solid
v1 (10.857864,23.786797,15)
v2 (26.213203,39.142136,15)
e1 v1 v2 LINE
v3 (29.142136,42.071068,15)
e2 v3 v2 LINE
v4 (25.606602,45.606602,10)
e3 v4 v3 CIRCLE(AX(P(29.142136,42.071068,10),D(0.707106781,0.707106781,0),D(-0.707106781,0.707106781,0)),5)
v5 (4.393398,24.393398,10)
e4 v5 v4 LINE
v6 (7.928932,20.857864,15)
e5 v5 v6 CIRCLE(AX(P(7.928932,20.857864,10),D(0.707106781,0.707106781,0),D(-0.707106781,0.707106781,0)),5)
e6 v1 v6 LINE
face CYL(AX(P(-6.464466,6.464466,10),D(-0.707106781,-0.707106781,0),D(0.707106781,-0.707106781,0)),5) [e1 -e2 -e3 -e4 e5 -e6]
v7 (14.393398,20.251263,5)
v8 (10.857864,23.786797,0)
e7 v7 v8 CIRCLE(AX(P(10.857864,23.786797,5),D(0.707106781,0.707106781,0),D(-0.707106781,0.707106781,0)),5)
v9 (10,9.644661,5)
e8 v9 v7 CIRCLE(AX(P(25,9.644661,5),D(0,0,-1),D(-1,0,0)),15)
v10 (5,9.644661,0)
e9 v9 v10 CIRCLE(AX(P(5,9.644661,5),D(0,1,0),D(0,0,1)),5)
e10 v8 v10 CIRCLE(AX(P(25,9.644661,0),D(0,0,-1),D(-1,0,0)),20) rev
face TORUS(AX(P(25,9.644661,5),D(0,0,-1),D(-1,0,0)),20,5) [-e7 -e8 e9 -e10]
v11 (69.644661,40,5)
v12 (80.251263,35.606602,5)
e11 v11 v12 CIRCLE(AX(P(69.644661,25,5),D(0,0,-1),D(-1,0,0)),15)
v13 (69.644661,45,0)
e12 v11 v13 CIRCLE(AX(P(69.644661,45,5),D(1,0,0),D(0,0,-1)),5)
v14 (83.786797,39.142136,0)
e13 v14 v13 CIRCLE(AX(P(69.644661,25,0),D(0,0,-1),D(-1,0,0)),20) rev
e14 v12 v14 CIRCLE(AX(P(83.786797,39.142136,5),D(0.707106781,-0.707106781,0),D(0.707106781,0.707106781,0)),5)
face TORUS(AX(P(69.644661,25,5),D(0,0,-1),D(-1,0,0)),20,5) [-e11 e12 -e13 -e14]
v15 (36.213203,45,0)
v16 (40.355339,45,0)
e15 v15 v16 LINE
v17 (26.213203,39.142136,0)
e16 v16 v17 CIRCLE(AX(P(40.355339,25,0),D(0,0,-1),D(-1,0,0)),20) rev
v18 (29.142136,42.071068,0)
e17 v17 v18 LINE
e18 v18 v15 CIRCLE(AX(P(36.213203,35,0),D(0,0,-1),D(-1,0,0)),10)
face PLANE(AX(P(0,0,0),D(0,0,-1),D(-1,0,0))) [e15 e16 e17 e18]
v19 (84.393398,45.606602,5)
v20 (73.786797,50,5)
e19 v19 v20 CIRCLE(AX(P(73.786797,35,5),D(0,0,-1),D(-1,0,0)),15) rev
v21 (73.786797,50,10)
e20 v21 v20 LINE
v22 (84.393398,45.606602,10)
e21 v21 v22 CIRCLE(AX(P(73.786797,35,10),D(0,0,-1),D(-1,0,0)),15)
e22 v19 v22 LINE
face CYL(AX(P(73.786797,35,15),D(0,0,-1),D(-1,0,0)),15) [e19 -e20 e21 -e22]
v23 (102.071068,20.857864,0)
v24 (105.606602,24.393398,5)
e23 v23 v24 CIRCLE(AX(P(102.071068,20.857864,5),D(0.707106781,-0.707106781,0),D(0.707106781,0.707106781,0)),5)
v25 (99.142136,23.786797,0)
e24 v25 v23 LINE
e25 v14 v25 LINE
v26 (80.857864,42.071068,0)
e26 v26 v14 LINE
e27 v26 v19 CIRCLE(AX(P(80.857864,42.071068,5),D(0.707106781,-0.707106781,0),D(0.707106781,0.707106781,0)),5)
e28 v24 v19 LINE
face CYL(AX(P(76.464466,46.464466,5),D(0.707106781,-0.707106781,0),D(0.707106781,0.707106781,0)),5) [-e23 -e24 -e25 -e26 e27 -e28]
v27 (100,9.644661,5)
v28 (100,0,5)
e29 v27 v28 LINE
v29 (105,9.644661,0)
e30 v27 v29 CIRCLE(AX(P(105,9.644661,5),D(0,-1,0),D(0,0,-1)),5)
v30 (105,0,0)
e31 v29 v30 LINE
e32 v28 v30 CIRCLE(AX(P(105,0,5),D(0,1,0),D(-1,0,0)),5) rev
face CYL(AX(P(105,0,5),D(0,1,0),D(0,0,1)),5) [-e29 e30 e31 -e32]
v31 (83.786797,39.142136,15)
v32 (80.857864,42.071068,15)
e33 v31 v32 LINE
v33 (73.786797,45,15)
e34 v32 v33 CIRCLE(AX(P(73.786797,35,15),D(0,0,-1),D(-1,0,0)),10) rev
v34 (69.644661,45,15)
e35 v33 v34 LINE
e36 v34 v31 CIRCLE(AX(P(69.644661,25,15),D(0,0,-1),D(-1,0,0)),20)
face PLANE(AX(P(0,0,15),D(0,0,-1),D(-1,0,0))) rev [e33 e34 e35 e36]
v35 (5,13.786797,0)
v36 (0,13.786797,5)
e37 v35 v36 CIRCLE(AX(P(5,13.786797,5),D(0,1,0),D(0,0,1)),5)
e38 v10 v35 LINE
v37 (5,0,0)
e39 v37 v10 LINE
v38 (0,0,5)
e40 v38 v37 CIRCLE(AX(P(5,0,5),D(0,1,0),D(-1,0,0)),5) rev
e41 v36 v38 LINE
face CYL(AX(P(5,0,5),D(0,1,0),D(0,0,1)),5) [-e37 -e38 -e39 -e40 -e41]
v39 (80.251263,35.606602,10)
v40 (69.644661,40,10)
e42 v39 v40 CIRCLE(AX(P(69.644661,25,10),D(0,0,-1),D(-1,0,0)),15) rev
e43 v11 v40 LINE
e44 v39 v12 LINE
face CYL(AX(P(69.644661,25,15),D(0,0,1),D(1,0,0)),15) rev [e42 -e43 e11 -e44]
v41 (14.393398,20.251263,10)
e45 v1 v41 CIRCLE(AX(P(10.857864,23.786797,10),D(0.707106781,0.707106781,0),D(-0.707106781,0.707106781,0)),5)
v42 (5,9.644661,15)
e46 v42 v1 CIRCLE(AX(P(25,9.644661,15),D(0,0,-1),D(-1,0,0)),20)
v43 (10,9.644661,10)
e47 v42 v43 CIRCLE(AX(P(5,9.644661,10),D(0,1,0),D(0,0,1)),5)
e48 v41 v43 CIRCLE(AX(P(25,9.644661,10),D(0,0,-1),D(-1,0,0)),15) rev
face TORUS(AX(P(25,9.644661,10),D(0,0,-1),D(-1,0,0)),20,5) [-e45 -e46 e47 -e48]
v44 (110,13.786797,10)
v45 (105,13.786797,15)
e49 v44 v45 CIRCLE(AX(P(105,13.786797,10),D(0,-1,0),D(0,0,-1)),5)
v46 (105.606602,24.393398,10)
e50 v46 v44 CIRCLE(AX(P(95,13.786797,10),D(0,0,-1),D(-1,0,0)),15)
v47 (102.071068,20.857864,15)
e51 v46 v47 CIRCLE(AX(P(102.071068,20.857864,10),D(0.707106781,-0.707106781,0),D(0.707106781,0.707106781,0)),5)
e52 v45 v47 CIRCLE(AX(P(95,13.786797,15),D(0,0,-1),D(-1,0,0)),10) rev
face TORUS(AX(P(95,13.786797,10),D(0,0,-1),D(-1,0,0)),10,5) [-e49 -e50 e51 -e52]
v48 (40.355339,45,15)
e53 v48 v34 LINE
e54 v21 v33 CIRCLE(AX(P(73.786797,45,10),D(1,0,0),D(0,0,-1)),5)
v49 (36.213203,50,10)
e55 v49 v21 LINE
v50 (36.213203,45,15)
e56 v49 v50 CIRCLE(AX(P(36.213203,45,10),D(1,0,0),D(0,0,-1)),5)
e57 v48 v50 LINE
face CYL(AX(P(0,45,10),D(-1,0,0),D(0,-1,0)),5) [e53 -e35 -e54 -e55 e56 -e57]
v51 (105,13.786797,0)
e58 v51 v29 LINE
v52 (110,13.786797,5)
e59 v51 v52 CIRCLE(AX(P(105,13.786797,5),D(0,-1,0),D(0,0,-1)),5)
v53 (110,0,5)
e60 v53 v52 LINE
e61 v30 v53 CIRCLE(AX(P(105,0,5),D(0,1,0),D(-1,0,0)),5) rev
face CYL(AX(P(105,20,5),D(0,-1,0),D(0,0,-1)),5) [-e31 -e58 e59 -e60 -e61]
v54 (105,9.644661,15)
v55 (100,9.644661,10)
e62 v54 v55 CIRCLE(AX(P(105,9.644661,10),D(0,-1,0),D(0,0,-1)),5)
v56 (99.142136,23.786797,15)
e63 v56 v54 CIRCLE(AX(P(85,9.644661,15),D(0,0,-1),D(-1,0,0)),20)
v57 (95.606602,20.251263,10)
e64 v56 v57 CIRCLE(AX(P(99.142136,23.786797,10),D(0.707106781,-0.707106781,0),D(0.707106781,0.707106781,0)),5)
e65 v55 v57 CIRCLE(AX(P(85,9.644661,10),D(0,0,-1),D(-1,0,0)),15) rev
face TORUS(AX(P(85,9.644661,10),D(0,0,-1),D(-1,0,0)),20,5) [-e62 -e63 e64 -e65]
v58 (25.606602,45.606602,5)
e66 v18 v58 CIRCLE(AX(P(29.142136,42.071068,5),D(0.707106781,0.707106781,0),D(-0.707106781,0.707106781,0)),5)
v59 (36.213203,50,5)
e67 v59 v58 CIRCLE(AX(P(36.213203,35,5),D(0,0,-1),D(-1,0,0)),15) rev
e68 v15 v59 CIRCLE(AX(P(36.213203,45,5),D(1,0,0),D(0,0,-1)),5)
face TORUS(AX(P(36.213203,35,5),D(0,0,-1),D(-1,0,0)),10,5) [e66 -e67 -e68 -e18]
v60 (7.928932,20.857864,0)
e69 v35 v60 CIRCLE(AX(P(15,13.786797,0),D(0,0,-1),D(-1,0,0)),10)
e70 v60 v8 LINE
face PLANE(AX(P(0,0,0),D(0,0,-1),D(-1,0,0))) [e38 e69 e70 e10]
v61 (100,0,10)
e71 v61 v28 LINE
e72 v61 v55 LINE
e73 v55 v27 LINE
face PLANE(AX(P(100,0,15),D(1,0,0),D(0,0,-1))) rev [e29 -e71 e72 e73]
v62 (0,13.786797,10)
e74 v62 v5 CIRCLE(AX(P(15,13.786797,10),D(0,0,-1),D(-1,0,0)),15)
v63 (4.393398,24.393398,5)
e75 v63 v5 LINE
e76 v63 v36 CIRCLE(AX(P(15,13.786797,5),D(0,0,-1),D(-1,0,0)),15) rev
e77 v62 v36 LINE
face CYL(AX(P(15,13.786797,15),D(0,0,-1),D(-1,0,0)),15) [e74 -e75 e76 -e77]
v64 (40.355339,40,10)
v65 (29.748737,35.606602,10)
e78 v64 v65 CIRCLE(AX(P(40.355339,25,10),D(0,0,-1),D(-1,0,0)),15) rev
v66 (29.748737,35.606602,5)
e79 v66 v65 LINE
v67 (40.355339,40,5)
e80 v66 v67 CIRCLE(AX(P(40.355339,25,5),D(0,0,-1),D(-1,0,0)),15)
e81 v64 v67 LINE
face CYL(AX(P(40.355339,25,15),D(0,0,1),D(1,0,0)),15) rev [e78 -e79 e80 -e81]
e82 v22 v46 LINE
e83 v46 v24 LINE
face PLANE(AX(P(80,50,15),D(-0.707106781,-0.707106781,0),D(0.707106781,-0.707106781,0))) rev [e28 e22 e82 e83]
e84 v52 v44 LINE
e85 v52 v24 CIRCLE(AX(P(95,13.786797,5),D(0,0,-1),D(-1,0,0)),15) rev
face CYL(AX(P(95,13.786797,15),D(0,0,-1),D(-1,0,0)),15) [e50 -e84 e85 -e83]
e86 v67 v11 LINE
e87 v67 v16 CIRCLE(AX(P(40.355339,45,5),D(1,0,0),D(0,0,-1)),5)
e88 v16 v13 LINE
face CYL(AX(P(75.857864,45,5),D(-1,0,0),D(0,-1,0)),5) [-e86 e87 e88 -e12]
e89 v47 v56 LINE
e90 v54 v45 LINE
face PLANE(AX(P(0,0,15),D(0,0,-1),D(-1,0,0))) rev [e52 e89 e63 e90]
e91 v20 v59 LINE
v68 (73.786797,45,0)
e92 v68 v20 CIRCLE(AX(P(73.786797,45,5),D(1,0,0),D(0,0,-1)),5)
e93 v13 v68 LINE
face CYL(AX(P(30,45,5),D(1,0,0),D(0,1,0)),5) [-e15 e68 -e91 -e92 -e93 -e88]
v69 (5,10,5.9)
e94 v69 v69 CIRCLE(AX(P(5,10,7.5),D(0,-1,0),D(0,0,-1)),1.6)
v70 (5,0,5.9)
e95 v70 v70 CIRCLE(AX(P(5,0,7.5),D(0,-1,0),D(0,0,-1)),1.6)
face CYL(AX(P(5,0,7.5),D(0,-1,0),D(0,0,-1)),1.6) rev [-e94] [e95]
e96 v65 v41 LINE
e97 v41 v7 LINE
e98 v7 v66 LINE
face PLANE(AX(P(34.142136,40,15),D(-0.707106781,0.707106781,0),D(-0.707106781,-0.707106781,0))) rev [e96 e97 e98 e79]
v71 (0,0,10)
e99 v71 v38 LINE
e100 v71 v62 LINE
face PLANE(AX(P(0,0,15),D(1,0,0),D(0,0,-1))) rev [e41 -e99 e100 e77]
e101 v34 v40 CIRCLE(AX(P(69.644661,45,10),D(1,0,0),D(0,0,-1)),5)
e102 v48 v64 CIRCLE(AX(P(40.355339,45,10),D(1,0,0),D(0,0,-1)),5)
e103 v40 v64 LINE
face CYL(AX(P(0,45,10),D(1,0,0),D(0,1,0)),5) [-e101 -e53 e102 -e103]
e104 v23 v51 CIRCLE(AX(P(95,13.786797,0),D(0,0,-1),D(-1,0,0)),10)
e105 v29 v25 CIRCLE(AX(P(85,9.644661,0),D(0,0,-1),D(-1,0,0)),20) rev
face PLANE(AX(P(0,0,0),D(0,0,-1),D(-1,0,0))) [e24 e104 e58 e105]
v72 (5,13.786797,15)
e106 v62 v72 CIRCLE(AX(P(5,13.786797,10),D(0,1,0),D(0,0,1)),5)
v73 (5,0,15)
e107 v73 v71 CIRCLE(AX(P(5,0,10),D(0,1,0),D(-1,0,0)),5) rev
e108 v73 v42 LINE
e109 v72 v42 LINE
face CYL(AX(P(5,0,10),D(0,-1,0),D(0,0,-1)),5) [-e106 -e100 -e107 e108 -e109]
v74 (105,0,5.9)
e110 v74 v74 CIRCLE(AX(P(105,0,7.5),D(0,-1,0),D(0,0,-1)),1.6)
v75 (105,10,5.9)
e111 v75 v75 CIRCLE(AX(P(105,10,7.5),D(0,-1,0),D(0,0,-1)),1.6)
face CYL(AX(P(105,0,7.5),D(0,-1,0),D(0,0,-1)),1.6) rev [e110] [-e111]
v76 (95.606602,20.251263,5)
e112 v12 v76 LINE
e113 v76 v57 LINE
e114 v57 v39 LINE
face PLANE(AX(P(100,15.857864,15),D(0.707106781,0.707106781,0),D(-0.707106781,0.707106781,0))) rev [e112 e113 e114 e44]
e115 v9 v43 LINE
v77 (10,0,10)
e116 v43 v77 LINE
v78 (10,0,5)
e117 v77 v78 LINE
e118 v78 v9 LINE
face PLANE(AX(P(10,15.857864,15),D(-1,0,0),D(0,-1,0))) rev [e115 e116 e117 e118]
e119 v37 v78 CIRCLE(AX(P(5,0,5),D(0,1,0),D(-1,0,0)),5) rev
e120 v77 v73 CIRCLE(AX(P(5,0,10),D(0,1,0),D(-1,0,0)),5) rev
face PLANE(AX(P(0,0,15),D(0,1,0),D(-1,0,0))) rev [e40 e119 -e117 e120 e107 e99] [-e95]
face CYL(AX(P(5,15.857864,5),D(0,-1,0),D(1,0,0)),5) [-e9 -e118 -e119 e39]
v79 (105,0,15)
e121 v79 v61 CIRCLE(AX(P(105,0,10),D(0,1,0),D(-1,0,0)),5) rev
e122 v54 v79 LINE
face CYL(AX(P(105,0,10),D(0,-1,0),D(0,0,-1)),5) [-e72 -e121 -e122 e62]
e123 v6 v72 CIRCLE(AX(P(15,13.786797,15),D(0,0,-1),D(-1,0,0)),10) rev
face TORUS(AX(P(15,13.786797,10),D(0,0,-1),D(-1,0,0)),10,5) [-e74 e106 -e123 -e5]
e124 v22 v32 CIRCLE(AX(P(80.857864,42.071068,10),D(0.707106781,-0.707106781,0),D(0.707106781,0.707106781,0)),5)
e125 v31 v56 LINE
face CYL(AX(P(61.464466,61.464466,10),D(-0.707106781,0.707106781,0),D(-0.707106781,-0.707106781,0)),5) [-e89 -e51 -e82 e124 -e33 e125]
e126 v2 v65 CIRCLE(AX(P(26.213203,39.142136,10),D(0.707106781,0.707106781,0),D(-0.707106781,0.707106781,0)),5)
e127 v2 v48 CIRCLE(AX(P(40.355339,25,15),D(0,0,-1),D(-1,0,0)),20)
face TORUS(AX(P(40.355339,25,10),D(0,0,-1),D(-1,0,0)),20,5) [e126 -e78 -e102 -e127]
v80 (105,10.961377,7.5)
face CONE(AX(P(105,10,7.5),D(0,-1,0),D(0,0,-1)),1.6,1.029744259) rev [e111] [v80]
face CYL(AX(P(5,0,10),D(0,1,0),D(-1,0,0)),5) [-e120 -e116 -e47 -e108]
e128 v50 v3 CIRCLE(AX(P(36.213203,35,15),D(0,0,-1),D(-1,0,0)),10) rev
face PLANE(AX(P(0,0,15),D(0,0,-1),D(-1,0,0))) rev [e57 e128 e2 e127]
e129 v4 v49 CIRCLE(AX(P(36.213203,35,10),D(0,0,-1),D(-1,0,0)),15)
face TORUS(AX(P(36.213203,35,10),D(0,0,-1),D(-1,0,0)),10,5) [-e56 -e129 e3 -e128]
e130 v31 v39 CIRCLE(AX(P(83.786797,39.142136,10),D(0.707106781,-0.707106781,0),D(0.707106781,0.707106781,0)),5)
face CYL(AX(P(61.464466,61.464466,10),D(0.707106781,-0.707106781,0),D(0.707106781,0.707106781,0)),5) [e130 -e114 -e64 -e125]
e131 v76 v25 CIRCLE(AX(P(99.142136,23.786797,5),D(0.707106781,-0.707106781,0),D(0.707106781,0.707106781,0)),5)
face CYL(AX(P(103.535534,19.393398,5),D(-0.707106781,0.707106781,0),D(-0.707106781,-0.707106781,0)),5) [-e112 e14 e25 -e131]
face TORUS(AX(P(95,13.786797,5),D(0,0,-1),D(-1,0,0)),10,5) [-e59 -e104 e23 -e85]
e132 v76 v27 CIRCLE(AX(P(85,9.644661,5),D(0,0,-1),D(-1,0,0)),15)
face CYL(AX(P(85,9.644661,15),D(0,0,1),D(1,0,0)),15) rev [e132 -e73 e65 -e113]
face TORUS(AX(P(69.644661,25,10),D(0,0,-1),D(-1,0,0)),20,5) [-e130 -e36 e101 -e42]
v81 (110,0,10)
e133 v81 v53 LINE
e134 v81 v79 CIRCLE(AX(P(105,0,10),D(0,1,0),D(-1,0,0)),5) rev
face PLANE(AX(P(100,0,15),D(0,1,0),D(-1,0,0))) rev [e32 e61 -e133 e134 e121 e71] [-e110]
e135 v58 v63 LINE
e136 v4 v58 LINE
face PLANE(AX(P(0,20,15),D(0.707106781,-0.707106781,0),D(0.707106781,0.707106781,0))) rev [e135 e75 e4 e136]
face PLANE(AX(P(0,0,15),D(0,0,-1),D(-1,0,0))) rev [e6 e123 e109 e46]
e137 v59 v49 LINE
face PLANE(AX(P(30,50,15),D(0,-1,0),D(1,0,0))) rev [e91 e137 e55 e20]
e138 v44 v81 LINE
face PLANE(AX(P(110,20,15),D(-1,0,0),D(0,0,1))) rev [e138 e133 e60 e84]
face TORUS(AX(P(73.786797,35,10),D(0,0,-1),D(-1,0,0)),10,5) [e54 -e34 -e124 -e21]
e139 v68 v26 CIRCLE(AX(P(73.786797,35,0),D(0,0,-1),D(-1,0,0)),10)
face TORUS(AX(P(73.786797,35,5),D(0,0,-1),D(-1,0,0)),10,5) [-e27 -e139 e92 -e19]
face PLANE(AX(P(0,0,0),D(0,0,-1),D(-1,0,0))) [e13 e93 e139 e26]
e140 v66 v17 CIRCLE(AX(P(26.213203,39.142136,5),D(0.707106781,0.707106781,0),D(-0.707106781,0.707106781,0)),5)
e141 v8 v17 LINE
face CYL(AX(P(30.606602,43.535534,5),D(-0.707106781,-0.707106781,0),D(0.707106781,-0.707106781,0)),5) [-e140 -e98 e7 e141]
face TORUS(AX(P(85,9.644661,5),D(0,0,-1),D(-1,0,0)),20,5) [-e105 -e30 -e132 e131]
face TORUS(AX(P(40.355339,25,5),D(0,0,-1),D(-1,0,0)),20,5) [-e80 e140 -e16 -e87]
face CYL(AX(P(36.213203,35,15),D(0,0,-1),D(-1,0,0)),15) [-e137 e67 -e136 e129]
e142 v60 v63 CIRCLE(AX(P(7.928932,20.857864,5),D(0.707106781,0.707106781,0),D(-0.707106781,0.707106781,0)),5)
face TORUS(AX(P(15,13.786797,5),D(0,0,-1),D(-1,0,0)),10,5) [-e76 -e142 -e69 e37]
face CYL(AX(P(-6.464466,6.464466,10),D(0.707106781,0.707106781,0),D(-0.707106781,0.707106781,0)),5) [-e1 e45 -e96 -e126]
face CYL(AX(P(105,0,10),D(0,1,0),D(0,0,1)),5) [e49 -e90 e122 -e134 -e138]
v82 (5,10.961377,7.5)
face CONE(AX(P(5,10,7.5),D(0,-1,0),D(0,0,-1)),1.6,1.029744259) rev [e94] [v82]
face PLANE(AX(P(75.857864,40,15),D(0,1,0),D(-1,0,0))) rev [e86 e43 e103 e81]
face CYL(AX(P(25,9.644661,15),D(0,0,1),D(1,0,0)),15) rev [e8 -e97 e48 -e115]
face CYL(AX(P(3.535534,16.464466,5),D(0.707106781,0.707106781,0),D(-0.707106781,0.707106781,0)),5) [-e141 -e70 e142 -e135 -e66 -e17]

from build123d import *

# Parameters (mm, degrees)
BOSS_EXTRU_1_DEPTH                  = 15
CONG_4_R                            = 15
CONG_5_R                            = 5
DIAM_TRE_DU_PER_AGE_3_2_3_2_1_D     = 3.2
DIAM_TRE_DU_PER_AGE_3_2_3_2_1_DEPTH = 10
DIAM_TRE_DU_PER_AGE_3_2_3_2_1_TIP   = 0.96137699


with BuildPart() as part:
    # Esquisse1 → Boss.-Extru.1 (new body)
    with BuildSketch(Plane.XY):
        Polygon((100, 0), (110, 0), (110, 20), (80, 50), (30, 50), (0, 20), (0, 0), (10, 0), (10, 15.857864376), (34.142135624, 40), (75.857864376, 40), (100, 15.857864376), align=None)
    extrude(amount=BOSS_EXTRU_1_DEPTH)

    # Congé4
    cong_4_edges = [part.edges().sort_by_distance(p)[0] for p in [
        (0, 20, 7.5),
        (30, 50, 7.5),
        (80, 50, 7.5),
        (110, 20, 7.5),
        (100, 15.857864376, 7.5),
        (75.857864376, 40, 7.5),
        (34.142135624, 40, 7.5),
        (10, 15.857864376, 7.5),
    ]]
    fillet(cong_4_edges, radius=CONG_4_R)

    # Congé5
    cong_5_edges = [part.edges().sort_by_distance(p)[0] for p in [
        (100, 4.82233047, 0),
        (98.858192988, 15.384912426, 0),
        (87.928932188, 27.928932188, 0),
        (75.384912426, 38.858192988, 0),
        (55, 40, 0),
        (34.615087574, 38.858192988, 0),
        (22.071067812, 27.928932188, 0),
        (11.141807012, 15.384912426, 0),
        (10, 4.82233047, 0),
        (0, 6.893398282, 0),
        (1.141807012, 19.52704805, 0),
        (15, 35, 0),
        (30.47295195, 48.858192988, 0),
        (55, 50, 0),
        (79.52704805, 48.858192988, 0),
        (95, 35, 0),
        (108.858192988, 19.52704805, 0),
        (110, 6.893398282, 0),
        (110, 6.893398282, 15),
        (108.858192988, 19.52704805, 15),
        (95, 35, 15),
        (79.52704805, 48.858192988, 15),
        (0, 6.893398282, 15),
        (1.141807012, 19.52704805, 15),
        (15, 35, 15),
        (30.47295195, 48.858192988, 15),
        (10, 4.82233047, 15),
        (11.141807012, 15.384912426, 15),
        (22.071067812, 27.928932188, 15),
        (34.615087574, 38.858192988, 15),
        (55, 40, 15),
        (75.384912426, 38.858192988, 15),
        (100, 4.82233047, 15),
        (98.858192988, 15.384912426, 15),
        (55, 50, 15),
        (87.928932188, 27.928932188, 15),
    ]]
    fillet(cong_5_edges, radius=CONG_5_R - 0.0001)  # a hair under: the kernel refuses the full size

    # Diamètre du perçage Ø3.2 (3.2)1
    with Locations(Plane(origin=(0, 0, 0), x_dir=(-1, 0, 0), z_dir=(0, -1, 0))):
        with Locations((-105, -7.5), (-5, -7.5)):
            Hole(DIAM_TRE_DU_PER_AGE_3_2_3_2_1_D / 2, depth=DIAM_TRE_DU_PER_AGE_3_2_3_2_1_DEPTH)
            with Locations((0, 0, -(DIAM_TRE_DU_PER_AGE_3_2_3_2_1_DEPTH + DIAM_TRE_DU_PER_AGE_3_2_3_2_1_TIP / 2))):  # 118° drill point
                Cone(0, DIAM_TRE_DU_PER_AGE_3_2_3_2_1_D / 2, DIAM_TRE_DU_PER_AGE_3_2_3_2_1_TIP, mode=Mode.SUBTRACT)


solid = part.part
